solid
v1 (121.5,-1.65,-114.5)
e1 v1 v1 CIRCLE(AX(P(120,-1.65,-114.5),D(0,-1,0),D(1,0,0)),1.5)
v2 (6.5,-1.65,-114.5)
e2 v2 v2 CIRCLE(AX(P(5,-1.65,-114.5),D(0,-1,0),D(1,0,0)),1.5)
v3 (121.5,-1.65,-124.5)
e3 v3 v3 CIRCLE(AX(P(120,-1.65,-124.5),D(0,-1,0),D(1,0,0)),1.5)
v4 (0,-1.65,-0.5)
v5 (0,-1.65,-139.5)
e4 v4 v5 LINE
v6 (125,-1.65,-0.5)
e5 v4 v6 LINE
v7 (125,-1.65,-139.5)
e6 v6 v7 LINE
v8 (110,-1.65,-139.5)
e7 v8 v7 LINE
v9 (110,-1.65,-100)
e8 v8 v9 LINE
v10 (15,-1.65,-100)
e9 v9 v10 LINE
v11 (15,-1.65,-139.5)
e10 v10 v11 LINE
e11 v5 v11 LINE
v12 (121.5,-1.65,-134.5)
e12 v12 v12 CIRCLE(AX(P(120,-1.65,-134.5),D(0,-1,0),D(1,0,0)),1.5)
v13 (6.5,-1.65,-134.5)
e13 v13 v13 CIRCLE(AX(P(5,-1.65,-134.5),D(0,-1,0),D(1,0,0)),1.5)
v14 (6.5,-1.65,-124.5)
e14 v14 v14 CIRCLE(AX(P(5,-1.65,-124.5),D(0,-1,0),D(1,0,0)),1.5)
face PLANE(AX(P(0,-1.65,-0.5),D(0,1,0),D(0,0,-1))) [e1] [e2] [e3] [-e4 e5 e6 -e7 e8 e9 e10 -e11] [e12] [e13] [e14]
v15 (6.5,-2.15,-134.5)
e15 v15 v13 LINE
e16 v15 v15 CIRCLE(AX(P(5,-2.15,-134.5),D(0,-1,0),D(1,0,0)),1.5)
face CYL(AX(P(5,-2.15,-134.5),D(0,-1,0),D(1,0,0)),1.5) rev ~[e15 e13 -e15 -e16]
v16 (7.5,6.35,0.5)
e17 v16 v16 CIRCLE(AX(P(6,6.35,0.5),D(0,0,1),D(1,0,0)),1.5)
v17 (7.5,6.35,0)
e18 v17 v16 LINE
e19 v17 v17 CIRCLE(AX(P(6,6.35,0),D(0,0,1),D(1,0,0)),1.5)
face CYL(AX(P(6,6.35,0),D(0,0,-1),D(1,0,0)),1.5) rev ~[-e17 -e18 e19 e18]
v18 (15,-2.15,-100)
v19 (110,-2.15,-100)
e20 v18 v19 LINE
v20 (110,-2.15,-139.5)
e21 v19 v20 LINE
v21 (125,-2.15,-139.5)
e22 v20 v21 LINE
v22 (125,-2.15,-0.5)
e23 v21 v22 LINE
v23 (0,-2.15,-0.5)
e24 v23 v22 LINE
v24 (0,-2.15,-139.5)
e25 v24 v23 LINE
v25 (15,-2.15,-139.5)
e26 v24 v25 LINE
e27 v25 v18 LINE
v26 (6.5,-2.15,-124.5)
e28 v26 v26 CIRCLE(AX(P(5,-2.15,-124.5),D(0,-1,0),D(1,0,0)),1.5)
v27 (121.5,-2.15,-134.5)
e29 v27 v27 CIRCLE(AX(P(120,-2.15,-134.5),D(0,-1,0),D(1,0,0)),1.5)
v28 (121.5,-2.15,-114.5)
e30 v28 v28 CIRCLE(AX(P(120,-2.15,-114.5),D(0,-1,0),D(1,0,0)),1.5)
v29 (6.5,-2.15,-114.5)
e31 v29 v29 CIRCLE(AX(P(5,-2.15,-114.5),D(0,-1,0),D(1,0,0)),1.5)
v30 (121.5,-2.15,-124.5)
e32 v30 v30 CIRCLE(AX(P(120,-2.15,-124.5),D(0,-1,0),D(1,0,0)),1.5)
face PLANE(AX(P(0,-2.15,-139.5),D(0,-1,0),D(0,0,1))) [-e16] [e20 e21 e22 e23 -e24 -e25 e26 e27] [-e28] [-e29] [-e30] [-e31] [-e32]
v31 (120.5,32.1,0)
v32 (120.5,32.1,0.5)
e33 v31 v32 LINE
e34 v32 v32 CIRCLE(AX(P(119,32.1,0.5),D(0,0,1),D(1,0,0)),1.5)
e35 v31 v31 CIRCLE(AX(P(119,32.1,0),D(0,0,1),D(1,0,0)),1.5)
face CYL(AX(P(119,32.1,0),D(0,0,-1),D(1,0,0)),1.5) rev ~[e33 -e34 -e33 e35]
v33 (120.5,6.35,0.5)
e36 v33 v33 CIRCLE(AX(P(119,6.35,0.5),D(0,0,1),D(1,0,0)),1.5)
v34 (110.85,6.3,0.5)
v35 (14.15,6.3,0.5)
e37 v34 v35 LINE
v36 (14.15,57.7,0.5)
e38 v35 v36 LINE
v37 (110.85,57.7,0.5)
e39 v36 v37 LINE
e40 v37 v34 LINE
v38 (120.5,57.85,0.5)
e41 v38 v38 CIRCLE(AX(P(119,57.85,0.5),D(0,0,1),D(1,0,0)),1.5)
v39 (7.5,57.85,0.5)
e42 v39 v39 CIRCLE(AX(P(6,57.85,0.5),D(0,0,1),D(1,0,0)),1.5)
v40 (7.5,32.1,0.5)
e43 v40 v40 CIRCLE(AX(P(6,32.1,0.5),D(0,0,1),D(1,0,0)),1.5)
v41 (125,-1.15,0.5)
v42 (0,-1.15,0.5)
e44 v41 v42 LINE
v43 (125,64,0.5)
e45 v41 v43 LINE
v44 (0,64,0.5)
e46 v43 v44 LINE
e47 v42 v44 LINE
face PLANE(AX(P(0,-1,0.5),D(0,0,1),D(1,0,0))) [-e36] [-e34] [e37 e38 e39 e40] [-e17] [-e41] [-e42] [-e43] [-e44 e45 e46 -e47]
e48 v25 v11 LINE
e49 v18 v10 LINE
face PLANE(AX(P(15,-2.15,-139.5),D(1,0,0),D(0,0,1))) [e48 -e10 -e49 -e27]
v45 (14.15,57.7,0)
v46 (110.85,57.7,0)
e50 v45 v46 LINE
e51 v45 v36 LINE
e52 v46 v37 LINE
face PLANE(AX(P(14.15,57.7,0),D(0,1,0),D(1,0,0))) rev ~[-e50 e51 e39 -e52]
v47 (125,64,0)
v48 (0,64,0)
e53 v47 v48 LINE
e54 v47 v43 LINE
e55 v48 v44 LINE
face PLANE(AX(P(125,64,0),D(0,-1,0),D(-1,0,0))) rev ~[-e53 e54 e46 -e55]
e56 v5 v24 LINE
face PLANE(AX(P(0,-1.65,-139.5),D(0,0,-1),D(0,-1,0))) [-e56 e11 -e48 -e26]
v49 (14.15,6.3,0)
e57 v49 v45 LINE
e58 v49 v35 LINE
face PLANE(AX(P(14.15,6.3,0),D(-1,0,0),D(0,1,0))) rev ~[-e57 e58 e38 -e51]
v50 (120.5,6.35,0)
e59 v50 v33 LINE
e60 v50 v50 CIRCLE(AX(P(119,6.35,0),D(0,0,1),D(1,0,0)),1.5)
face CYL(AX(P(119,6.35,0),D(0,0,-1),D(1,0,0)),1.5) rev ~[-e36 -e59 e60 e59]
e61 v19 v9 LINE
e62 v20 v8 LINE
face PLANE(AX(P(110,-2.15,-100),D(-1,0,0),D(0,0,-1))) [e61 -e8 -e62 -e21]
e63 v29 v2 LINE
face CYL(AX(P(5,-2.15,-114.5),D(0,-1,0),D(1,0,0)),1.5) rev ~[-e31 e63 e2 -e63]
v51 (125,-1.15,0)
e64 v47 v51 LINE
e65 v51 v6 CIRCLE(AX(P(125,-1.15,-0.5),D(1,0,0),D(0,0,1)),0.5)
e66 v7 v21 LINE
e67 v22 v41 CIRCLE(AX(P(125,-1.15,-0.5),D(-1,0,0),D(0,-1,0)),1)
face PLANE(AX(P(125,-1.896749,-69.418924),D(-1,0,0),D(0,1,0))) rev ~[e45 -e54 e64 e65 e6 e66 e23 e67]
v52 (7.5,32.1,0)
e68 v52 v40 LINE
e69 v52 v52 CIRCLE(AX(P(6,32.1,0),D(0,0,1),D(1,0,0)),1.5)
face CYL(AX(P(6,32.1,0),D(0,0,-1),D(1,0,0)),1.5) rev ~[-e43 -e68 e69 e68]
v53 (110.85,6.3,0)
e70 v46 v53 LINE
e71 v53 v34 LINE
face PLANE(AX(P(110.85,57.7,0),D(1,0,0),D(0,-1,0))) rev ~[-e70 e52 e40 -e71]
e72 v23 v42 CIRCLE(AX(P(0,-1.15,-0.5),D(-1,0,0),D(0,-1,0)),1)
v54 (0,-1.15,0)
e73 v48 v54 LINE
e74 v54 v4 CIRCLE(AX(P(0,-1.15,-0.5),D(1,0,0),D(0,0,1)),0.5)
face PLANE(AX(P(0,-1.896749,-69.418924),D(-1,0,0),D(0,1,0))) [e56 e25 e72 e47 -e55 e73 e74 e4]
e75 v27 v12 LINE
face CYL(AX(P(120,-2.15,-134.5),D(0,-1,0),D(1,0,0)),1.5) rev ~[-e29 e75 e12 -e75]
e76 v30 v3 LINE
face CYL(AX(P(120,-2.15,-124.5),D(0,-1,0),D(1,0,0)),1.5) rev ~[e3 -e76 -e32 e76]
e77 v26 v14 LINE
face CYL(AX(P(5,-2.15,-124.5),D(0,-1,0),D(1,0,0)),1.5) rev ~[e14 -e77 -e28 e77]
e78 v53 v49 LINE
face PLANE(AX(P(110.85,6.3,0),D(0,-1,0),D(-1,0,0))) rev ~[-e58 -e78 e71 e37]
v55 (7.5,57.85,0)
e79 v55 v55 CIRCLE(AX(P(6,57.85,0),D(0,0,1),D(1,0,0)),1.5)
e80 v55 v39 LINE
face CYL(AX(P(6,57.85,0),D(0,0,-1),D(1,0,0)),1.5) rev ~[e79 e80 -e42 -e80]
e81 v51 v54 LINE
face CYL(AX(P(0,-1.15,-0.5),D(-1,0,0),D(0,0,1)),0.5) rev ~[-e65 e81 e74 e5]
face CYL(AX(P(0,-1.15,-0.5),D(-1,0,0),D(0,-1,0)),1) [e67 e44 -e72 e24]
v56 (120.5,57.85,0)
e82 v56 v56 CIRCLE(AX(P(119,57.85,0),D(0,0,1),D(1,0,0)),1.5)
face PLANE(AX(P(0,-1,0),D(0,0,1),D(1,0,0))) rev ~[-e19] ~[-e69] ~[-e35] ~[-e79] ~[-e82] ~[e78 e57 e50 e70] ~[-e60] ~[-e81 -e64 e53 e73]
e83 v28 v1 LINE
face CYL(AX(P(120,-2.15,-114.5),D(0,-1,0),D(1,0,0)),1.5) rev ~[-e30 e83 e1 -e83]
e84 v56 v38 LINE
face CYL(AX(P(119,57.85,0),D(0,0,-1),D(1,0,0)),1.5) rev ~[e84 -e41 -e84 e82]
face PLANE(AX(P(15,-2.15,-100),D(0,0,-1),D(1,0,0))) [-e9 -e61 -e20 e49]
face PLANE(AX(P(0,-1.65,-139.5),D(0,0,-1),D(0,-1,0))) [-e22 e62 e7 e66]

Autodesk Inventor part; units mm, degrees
ref_plane "YZ Plane" through (0, 0, 0) normal (1, 0, 0) x (0, 1, 0)
ref_plane "XZ Plane" through (0, 0, 0) normal (0, 1, 0) x (-1, 0, 0)
ref_plane "XY Plane" through (0, 0, 0) normal (0, 0, 1) x (1, 0, 0)
sketch "Sketch1" plane through (0, 0, 0) normal (0, 0, 1) x (1, 0, 0)
  line L0 (0, 0) -> (125, 0)
  line L1 (125, 0) -> (125, 64)
  line L2 (125, 64) -> (0, 64)
  line L3 (0, 64) -> (0, 0)
  line L4 (0, 64) -> (14.15, 64) construction
  line L5 (14.15, 64) -> (14.15, 57.7) construction
  line L6 (14.15, 57.7) -> (110.85, 57.7)
  line L7 (110.85, 57.7) -> (110.85, 6.3)
  line L8 (110.85, 6.3) -> (14.15, 6.3)
  line L9 (14.15, 6.3) -> (14.15, 57.7)
  line L10 (0, 64) -> (0, 57.85) construction
  line L11 (0, 57.85) -> (6, 57.85) construction
  line L12 (6, 57.85) -> (6, 32.1) construction
  line L13 (6, 32.1) -> (6, 6.35) construction
  line L14 (6, 6.35) -> (119, 6.35) construction
  line L15 (119, 6.35) -> (119, 32.1) construction
  line L16 (119, 32.1) -> (119, 57.85) construction
  circle A0 centre (6, 57.85) radius 1.5
  circle A1 centre (6, 32.1) radius 1.5
  circle A2 centre (6, 6.35) radius 1.5
  circle A3 centre (119, 6.35) radius 1.5
  circle A4 centre (119, 57.85) radius 1.5
  circle A5 centre (119, 32.1) radius 1.5
  dimension "d0" = 125
  dimension "d1" = 64
  dimension "d2" = 14.15
  dimension "d3" = 6.3
  dimension "d4" = 96.7
  dimension "d5" = 51.4
  dimension "d6" = 6.15
  dimension "d7" = 6
  dimension "d8" = 25.75
  dimension "d9" = 25.75
  dimension "d10" = 113
  dimension "d11" = 3
  dimension "d12" = 3
  dimension "d13" = 3
  dimension "d14" = 3
  dimension "d16" = 3
  dimension "d18" = 3
extrude "Plate2" add sketch "Sketch1" along normal blind 0.5
sketch "Sketch2" plane through (0, 0, 0.5) normal (0, 0, 1) x (1, 0, 0)
  line L0 (0, 0) -> (125, 0)
  line L1 (125, 0) -> (125, -1)
  line L2 (125, -1) -> (0, -1)
  line L3 (0, -1) -> (0, 0)
  dimension "d20" = 125
  dimension "d21" = 1
sheet face with bend "Face3" sketch "Sketch2" thickness 0.5 toward (0, 0, -1) bend radius 0.5
bend "Bend1"
sketch "Sketch4" plane through (0, -1, 0.5) normal (0, -1, 0) x (1, 0, 0)
  line L0 (0, -0.5) -> (125, -0.5) projected
  line L1 (125, 0) -> (125, -0.5) projected
  line L2 (0, 0) -> (125, 0) projected
  line L3 (0, 0) -> (0, -0.5) projected
extrude "Extrusion1" add sketch "Sketch4" along normal blind 1.15
sketch "Sketch5" plane through (0, -1.65, 0.5) normal (0, -1, 0) x (1, 0, 0)
  line L0 (125, 0) -> (0, 0)
  line L1 (0, 0) -> (0, -140)
  line L2 (0, -140) -> (125, -140)
  line L3 (125, -140) -> (125, 0)
edge flange "Flange2" height 140 angle 90 thickness 0.5 bend radius 0.5 thickness toward (0, -1, 0) relief tear relief width 0.5 relief depth 0.25 edges at (62.5, -2.15, 0) wall of the first edge with corners at (125, -1.65, 0.5) (0, -1.65, 0.5) (0, -1.65, -139.5) (125, -1.65, -139.5)
bend "Bend3"
corner "Corner2"
sketch "Sketch6" plane through (0, -2.15, -139.5) normal (0, -1, 0) x (1, 0, 0)
  line L0 (0, 0) -> (0, 139) projected
  line L1 (125, 0) -> (0, 0) projected
  line L2 (125, 0) -> (120, 0) construction
  line L3 (120, 0) -> (120, 5) construction
  line L4 (120, 0) -> (110, 0) construction
  line L5 (110, 0) -> (110, 39.5) construction
  line L6 (110, 39.5) -> (15, 39.5) construction
  line L7 (15, 39.5) -> (110, 39.5)
  line L8 (110, 39.5) -> (110, 0)
  line L9 (110, 0) -> (15, 0)
  line L10 (15, 0) -> (15, 39.5)
  circle A0 centre (120, 5) radius 1.5
  line L11 (120, 5) -> (120, 15) construction
  line L12 (120, 15) -> (120, 25) construction
  circle A1 centre (120, 15) radius 1.5
  circle A2 centre (120, 25) radius 1.5
  line L13 (15, 0) -> (5, 0)
  circle A3 centre (5, 5) radius 1.5
  circle A4 centre (5, 15) radius 1.5
  circle A5 centre (5, 25) radius 1.5
  point P0 (0, 139.5)
  dimension "d49" = 5
  dimension "d50" = 5
  dimension "d51" = 10
  dimension "d52" = 39.5
  dimension "d53" = 95
  dimension "d54" = 3
  dimension "d55" = 10
  dimension "d56" = 10
  dimension "d57" = 3
  dimension "d58" = 3
  dimension "d59" = 10
  dimension "d60" = 3
  dimension "d61" = 3
  dimension "d62" = 3
extrude "Extrusion2" cut sketch "Sketch6" against normal blind 1.15
equation "\"d19\" = Thickness"
equation "\"d22\" = BendRadius"
equation "\"d23\" = BendReliefWidth"
equation "\"d25\" = MinimumRemnant"
equation "\"d24\" = BendReliefDepth"
equation "\"d26\" = TransitionRadius"
equation "\"d39\" = BendReliefWidth"
equation "\"d40\" = BendReliefDepth"
equation "\"d41\" = MinimumRemnant"
equation "\"d42\" = TransitionRadius"
equation "\"d45\" = BendRadius"
equation "\"d46\" = CornerReliefSize"
equation "\"d47\" = GapSize"
equation "\"d48\" = JacobiRadiusSize"
equation "\"BendRadius\" = Thickness"
equation "\"BendReliefWidth\" = Thickness"
equation "\"BendReliefDepth\" = 0.5 * Thickness"
equation "\"CornerReliefSize\" = 4 * Thickness"
equation "\"MinimumRemnant\" = 2 * Thickness"
equation "\"TransitionRadius\" = BendRadius"
equation "\"JacobiRadiusSize\" = BendRadius"
equation "\"GapSize\" = Thickness"
equation "\"Thickness\" = 0.5"
properties part number "psu mount"
